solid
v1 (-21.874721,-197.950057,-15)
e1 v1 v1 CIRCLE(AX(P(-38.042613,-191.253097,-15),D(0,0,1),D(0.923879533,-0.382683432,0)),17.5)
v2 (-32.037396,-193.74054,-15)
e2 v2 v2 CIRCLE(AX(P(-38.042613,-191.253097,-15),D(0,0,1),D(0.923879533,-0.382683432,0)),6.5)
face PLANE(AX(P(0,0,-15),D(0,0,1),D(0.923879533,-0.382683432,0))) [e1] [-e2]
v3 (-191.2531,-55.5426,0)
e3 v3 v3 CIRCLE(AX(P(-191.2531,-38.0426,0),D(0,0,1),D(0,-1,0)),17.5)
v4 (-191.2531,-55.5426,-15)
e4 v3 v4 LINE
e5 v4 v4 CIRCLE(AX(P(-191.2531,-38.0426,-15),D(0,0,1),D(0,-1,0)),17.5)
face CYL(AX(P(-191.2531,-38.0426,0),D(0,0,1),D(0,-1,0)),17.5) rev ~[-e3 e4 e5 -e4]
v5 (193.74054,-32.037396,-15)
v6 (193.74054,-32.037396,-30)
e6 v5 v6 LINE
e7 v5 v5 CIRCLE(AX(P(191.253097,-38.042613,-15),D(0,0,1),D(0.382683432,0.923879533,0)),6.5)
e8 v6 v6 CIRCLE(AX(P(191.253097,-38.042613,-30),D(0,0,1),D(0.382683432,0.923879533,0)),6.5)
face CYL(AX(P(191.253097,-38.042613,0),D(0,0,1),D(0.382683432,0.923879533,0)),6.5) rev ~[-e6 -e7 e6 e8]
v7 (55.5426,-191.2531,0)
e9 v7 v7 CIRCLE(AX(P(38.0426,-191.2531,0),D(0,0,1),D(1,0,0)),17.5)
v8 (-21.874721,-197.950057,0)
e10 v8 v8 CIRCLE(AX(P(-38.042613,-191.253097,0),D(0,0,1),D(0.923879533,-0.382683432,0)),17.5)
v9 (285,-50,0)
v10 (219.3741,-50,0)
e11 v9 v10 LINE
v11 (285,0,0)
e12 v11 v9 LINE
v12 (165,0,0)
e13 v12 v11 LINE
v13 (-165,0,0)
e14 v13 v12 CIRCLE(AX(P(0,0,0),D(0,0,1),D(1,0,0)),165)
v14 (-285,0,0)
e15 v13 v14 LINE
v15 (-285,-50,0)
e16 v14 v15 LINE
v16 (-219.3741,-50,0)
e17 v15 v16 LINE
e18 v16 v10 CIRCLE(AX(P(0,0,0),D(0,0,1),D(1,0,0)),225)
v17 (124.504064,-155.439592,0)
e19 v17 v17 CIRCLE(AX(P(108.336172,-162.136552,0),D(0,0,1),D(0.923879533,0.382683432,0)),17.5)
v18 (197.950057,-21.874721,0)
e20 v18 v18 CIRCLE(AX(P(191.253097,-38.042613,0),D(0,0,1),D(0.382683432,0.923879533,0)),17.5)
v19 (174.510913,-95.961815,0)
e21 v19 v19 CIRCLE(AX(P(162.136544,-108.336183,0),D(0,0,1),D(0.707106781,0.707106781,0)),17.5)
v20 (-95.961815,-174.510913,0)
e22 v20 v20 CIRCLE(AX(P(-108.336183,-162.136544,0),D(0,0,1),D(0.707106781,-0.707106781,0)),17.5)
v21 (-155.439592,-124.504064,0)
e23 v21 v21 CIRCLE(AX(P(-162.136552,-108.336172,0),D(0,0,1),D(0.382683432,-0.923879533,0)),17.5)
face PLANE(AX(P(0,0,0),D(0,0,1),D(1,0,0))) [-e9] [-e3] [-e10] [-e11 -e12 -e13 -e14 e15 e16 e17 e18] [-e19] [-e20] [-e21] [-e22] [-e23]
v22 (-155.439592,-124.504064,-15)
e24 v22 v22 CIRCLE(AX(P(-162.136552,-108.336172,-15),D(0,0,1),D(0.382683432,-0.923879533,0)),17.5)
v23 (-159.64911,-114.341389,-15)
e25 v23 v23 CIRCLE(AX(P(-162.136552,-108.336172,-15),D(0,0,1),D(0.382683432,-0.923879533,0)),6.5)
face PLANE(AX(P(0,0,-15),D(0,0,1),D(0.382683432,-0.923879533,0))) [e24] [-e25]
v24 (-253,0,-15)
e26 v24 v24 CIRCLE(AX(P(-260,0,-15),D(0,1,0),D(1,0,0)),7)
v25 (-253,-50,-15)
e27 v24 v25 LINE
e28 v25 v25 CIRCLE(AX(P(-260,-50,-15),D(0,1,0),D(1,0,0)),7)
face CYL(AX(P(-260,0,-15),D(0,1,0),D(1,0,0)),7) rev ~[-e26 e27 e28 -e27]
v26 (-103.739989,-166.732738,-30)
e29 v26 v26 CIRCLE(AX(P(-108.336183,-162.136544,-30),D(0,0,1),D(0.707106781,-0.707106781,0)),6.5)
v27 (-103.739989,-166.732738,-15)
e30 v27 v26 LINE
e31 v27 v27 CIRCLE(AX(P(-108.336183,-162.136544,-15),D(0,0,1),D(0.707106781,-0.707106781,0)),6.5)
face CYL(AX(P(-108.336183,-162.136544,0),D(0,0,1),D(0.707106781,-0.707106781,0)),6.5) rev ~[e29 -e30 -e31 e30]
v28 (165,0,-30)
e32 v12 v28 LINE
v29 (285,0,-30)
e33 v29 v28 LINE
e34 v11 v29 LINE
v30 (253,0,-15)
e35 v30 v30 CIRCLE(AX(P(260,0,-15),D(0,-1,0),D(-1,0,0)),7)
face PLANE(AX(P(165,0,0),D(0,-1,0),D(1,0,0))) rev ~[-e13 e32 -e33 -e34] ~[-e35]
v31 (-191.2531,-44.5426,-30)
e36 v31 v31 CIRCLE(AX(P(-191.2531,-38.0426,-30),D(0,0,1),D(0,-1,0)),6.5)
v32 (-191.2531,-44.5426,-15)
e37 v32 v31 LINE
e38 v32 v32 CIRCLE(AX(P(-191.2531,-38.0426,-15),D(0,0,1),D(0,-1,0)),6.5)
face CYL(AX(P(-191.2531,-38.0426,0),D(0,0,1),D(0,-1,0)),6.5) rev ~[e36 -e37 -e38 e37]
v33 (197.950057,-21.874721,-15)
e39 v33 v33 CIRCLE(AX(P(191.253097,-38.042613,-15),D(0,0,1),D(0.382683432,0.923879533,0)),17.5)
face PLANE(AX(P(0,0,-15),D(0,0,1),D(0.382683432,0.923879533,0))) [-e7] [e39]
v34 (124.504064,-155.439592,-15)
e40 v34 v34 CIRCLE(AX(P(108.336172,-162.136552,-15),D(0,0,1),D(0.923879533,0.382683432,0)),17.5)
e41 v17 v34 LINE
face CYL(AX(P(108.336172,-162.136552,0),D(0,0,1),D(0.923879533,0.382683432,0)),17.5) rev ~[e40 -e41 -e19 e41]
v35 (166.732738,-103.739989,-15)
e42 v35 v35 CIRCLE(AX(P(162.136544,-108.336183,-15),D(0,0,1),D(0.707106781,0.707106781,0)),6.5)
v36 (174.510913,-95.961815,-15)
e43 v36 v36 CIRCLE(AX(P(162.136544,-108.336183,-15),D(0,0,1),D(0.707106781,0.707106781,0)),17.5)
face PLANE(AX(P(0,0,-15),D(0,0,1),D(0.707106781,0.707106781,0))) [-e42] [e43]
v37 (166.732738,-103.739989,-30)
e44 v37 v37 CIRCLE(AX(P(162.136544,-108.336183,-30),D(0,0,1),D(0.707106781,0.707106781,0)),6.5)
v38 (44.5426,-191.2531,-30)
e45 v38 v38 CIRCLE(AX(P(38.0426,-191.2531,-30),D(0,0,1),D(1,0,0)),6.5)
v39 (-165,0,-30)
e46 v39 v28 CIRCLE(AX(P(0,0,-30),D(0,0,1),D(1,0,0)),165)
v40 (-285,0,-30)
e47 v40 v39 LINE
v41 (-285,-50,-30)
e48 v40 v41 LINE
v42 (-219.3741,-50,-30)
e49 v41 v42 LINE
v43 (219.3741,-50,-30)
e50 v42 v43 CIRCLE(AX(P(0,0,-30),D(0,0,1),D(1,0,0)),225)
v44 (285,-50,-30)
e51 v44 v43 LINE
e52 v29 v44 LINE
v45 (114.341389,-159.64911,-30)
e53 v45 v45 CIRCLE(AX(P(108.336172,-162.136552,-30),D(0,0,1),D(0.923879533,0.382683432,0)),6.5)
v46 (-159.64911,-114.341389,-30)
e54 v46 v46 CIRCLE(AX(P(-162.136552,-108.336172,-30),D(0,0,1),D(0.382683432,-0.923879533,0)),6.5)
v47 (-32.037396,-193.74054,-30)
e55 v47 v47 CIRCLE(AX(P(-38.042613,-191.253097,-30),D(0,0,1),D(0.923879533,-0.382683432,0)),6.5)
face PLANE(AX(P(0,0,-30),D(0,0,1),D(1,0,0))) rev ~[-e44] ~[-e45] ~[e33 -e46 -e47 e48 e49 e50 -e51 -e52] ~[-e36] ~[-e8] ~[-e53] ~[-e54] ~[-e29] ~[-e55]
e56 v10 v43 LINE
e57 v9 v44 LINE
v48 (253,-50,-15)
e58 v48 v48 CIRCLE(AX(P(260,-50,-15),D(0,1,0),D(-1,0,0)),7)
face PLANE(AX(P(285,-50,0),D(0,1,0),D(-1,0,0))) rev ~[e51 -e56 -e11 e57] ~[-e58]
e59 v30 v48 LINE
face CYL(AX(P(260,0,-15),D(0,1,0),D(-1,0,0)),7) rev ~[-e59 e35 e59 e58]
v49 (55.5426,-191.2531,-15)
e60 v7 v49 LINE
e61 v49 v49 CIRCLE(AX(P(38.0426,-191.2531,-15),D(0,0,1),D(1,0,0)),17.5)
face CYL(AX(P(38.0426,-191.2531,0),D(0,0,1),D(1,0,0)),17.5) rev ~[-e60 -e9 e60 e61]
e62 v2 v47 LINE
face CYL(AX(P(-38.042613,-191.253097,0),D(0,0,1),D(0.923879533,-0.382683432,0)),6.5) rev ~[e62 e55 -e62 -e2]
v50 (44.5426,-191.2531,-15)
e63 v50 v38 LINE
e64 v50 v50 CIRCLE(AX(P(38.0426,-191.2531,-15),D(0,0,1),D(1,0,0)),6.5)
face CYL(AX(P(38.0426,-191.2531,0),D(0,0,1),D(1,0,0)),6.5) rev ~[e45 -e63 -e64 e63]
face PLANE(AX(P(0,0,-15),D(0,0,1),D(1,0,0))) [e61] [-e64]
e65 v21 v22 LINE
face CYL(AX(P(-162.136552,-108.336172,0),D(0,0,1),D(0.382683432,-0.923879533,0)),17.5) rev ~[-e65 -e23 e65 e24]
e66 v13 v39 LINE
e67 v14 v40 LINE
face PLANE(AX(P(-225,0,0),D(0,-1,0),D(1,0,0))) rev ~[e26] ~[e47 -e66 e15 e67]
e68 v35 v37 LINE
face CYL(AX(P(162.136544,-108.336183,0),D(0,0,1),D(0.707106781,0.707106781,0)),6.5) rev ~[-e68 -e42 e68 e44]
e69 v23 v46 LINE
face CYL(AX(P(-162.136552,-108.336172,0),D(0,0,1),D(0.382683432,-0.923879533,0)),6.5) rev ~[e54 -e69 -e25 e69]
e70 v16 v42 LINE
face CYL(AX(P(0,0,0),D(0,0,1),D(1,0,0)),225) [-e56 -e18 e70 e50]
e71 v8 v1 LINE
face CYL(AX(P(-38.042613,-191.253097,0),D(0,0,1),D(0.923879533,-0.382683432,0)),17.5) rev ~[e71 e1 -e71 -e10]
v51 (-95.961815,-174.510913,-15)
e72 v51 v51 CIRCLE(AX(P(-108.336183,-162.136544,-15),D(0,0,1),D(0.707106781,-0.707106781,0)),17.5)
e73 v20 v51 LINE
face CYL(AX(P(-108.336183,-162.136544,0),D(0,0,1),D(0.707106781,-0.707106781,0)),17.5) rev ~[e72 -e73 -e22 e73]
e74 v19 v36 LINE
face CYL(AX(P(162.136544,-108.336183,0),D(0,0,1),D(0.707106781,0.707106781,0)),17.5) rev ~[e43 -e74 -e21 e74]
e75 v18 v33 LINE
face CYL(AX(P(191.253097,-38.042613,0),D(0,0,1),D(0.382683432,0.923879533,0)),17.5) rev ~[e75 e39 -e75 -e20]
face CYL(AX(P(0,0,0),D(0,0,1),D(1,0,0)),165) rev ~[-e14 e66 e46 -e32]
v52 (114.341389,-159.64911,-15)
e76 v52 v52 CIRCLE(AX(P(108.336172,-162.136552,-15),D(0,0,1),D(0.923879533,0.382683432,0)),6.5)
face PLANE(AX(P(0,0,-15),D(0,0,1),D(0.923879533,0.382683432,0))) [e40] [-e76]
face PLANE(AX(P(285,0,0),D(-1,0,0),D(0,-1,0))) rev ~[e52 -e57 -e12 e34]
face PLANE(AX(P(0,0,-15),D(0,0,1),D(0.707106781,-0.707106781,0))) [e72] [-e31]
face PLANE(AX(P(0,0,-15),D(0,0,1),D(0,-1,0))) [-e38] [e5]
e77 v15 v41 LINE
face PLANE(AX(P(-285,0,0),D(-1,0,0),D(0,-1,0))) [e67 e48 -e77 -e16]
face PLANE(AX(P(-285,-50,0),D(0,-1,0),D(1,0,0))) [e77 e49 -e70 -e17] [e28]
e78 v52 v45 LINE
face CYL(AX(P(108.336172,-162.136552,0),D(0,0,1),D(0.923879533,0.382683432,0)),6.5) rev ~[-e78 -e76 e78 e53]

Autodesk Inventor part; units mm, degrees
ref_plane "YZ Plane" through (0, 0, 0) normal (1, 0, 0) x (0, 1, 0)
ref_plane "XZ Plane" through (0, 0, 0) normal (0, 1, 0) x (-1, 0, 0)
ref_plane "XY Plane" through (0, 0, 0) normal (0, 0, 1) x (1, 0, 0)
sketch "Sketch1" plane through (0, 0, 0) normal (0, 0, 1) x (1, 0, 0)
  circle A0 centre (0, 0) radius 195 construction
  line L0 (0, 195) -> (0, 225) construction
  line L1 (0, 195) -> (0, 165) construction
  circle A1 centre (0, 0) radius 165
  circle A2 centre (0, 0) radius 225
  line L2 (-165, 0) -> (-165, 80)
  line L3 (-165, 80) -> (-225, 80)
  line L4 (-225, 80) -> (-225, 0)
  line L5 (165, 0) -> (165, 80)
  line L6 (165, 80) -> (225, 80)
  line L7 (225, 80) -> (225, 0)
  line L8 (-225, 0) -> (-165, 0)
  line L9 (165, 0) -> (225, 0)
  line L10 (-225, 0) -> (-285, 0)
  line L11 (-285, 0) -> (-285, -50)
  line L12 (-285, -50) -> (-219.3741, -50)
  line L13 (225, 0) -> (285, 0)
  line L14 (285, 0) -> (285, -50)
  line L15 (285, -50) -> (219.3741, -50)
  dimension "d13" = 390
  dimension "d26" = 80
  dimension "d36" = 60
  dimension "d40" = 60
  dimension "d41" = 50
extrude "Extrusion1" add sketch "Sketch1" against normal blind 30 contours L9 A2 L8 A1 | L13 L14 L15 A2 | A2 L12 L11 L10
sketch "Sketch4" plane through (0, 0, 0) normal (0, 0, 1) x (1, 0, 0)
  circle A0 centre (38.0426, -191.2531) radius 6.5
  line L0 (0, 0) -> (38.0426, -191.2531) construction
  line L1 (0, 0) -> (0, -276.8337) construction
  dimension "d17" = 13
  dimension "d27" = 195
  dimension "d35" = 11.25
extrude "Extrusion4" cut sketch "Sketch4" against normal through all
sketch "Sketch5" plane through (0, 0, 0) normal (0, 0, 1) x (1, 0, 0)
  circle A0 centre (38.0426, -191.2531) radius 6.5 projected
  circle A1 centre (38.0426, -191.2531) radius 17.5
  point P0 (0, 0)
  dimension "d23" = 35
extrude "Extrusion5" cut sketch "Sketch5" against normal blind 15
pattern_circular "Circular Pattern3" count 8 over 157.5 about axis through (0, 0, 0) along (0, 0, -1) of "Extrusion4", "Extrusion5" both ways yes
sketch "Sketch7" plane through (-285, 0, 0) normal (0, 1, 0) x (1, 0, 0)
  circle A0 centre (25, 15) radius 7
  line L0 (0, 0) -> (0, 30) projected
  point P0 (285, 0)
  point P1 (0, 15)
  dimension "d42" = 14
  dimension "d43" = 25
extrude "Extrusion7" cut sketch "Sketch7" against normal through all
mirror "Mirror1" about plane through (0, 0, 0) normal (1, 0, 0) of "Extrusion7"
equation "\"d13\" = Шпил_пласт_НОС_диам_центров"
equation "\"d40\" = d36"
equation "\"d27\" = 0.5 * Шпил_пласт_НОС_диам_центров"
equation "\"BendReliefDepth\" = 0.5 * Thickness"
equation "\"Шпил_пласт_НОС_диам_центров\" = 390"
equation "\"Thickness\" = 30"
properties part number "Постель 200 нос"
